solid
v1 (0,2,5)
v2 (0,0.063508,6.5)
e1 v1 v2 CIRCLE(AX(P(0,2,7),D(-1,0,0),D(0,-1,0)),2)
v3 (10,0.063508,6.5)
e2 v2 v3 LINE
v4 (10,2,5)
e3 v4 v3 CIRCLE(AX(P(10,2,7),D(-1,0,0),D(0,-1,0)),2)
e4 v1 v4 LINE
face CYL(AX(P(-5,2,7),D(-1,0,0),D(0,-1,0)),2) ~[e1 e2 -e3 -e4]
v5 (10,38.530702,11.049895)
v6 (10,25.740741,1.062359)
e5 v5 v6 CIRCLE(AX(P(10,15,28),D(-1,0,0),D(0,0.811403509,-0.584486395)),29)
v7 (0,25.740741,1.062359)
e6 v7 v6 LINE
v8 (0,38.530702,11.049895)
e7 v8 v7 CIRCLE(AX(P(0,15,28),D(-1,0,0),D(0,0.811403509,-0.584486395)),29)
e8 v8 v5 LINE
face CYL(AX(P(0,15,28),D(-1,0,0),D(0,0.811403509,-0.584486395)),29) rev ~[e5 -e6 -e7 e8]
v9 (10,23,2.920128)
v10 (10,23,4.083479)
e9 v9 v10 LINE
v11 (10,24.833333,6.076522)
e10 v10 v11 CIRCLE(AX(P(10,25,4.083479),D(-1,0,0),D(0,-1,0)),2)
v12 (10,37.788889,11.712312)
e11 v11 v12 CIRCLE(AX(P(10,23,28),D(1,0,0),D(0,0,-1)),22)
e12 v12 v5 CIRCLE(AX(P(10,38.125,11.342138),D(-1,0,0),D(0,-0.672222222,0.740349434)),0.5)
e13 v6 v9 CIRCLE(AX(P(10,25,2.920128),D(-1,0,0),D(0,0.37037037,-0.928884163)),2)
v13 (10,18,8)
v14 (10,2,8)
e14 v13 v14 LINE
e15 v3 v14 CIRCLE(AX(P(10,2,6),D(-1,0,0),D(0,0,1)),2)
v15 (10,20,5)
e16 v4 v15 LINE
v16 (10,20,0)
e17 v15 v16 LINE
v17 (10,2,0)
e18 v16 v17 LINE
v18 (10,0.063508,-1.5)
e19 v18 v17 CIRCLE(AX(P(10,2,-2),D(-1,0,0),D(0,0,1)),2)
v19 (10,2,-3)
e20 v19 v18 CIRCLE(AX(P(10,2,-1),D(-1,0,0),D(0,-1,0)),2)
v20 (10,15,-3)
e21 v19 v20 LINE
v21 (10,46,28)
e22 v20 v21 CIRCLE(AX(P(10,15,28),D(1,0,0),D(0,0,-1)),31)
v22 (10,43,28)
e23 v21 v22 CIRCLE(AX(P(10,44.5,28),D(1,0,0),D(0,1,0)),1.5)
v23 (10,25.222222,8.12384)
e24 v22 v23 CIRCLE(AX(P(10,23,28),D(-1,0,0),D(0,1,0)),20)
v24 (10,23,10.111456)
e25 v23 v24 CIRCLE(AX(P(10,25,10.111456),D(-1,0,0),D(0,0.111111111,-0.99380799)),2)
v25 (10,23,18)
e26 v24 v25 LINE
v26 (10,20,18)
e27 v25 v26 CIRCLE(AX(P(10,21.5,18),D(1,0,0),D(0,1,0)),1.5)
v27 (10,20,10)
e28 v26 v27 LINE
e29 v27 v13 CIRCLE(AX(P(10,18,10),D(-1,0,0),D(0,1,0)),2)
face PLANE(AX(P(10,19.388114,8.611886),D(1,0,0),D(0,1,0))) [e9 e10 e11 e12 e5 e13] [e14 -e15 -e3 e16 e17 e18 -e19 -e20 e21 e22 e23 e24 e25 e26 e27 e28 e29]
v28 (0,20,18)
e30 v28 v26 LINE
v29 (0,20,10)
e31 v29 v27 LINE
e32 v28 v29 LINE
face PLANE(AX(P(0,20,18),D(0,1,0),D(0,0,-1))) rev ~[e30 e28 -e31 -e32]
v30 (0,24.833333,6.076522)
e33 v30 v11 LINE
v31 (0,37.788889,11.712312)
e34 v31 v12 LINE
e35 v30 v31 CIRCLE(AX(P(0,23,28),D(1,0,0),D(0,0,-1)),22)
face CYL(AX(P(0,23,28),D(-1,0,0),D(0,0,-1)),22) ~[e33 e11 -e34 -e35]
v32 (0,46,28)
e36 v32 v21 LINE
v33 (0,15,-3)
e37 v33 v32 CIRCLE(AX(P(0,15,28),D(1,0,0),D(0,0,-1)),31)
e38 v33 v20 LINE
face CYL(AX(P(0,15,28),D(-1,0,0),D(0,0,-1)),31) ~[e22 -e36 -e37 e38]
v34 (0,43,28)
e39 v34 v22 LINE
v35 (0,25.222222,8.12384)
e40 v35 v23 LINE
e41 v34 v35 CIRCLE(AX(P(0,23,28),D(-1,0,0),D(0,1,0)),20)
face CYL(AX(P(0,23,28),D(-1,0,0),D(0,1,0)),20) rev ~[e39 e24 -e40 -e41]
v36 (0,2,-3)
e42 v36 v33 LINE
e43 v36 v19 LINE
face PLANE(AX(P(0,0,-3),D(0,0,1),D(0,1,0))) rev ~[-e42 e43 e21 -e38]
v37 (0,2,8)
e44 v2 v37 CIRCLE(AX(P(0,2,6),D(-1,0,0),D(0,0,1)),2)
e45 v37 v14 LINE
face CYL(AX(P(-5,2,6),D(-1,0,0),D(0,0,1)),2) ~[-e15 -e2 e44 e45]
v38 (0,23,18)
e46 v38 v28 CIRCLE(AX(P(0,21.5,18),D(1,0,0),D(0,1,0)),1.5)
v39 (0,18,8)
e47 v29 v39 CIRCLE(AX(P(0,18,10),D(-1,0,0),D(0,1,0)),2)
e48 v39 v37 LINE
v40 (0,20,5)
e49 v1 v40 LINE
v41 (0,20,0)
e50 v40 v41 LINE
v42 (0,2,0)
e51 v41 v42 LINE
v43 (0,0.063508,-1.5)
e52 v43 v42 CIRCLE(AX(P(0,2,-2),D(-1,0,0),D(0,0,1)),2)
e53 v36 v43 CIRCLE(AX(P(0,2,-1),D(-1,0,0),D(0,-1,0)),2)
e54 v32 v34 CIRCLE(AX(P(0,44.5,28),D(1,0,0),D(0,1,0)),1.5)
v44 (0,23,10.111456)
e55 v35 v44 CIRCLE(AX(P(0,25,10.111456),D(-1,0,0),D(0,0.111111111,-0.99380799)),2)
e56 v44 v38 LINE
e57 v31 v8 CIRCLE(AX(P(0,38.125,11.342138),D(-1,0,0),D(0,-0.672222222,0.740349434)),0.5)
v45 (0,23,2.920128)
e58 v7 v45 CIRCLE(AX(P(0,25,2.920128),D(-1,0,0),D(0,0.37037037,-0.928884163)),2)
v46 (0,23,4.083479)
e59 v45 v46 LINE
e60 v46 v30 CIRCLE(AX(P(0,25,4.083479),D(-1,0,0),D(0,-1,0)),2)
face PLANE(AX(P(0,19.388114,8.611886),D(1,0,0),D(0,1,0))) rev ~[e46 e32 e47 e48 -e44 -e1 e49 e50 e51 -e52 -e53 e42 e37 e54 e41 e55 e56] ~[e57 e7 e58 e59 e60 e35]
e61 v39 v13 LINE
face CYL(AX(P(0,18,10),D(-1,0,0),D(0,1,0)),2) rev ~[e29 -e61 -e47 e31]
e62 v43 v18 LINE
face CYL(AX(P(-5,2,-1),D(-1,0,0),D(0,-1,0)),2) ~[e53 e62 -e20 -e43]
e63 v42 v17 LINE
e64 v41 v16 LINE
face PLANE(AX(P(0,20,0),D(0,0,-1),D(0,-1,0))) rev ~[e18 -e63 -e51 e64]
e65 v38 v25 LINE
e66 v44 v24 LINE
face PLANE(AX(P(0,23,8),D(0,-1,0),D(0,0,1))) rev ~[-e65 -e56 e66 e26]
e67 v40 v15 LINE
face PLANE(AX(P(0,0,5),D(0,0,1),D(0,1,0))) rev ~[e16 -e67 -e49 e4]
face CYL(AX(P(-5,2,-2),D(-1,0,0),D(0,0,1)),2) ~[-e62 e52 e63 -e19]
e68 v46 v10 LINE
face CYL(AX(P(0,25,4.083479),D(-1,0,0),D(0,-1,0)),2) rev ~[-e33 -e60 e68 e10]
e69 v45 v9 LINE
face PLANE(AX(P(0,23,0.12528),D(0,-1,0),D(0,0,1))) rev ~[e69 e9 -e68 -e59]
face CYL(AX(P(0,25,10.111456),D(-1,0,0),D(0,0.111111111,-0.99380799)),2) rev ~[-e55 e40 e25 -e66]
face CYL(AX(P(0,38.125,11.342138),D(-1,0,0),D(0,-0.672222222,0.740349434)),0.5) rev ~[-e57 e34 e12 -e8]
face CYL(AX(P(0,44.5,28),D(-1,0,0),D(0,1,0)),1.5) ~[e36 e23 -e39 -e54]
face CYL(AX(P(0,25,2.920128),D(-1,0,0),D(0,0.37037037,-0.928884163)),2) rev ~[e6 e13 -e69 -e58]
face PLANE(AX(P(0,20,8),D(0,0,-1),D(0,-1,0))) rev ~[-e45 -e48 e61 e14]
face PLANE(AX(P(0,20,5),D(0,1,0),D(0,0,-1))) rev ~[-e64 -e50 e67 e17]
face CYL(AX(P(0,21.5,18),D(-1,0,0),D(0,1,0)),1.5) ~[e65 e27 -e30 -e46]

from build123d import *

# Parameters (mm, degrees)
F1_DEPTH    = 10
F2_T1_DEPTH = 10
F2_T3_DEPTH = 20


# Not quite as in the source:
# - a fillet or chamfer that OpenCascade refuses, or shapes differently, is made with other operations: its cross-section is extruded or revolved along the edge and cut away or added
# - a feature names something its author has since deleted; it is built from what else it names


with BuildPart() as f1:
    # F0 (on Right) → F1 (new body)
    with BuildSketch(Plane.YZ):
        with BuildLine():
            Line((20, 0), (0, 0))
            Line((0, 0), (0, -3))
            Line((0, -3), (15, -3))
            ThreePointArc((15, -3), (36.9203102168, 6.0796897832), (46, 28))
            ThreePointArc((46, 28), (44.5, 29.5), (43, 28))
            ThreePointArc((43, 28), (37.1421356237, 13.8578643763), (23, 8))
            Line((23, 8), (23, 18))
            ThreePointArc((23, 18), (21.5, 19.5), (20, 18))
            Line((20, 18), (20, 8))
            Line((20, 8), (0, 8))
            Line((0, 8), (0, 5))
            Line((0, 5), (20, 5))
            Line((20, 5), (20, 0))
        make_face()
        with BuildLine():
            Line((23, 0.1252802705), (23, 6))
            ThreePointArc((23, 6), (30.9268806632, 7.4777057094), (37.7888888889, 11.712312459))
            ThreePointArc((37.7888888889, 11.712312459), (38.4580316617, 11.7150853421), (38.5307017544, 11.0498945447))
            ThreePointArc((38.5307017544, 11.0498945447), (31.6848160775, 4.2804529457), (23, 0.1252802705))
        make_face(mode=Mode.SUBTRACT)
    extrude(amount=F1_DEPTH)

    # F2: fillet of radius 2 on 8 edges, made by hand

    # F2_s2 → F2_t1 (join)
    with BuildSketch(Plane.YZ):
        with BuildLine():
            ThreePointArc((20, 10), (19.4142135624, 8.5857864376), (18, 8))
            Line((18, 8), (20, 8))
            Line((20, 8), (20, 10))
        make_face()
        with BuildLine():
            ThreePointArc((25.2222222222, 8.1238402), (23.6666666667, 8.620744195), (23, 10.11145618))
            Line((23, 10.11145618), (23, 8))
            ThreePointArc((23, 8), (24.1128351181, 8.0309840503), (25.2222222222, 8.1238402))
        make_face()
        with BuildLine():
            ThreePointArc((23, 4.0834785138), (23.5280398556, 5.4374849146), (24.8333333333, 6.076521971))
            ThreePointArc((24.8333333333, 6.076521971), (23.9174648117, 6.0191388176), (23, 6))
            Line((23, 6), (23, 4.0834785138))
        make_face()
        with BuildLine():
            ThreePointArc((25.7407407407, 1.0623592655), (23.8778327846, 1.2646093225), (23, 2.920127592))
            Line((23, 2.920127592), (23, 0.1252802705))
            ThreePointArc((23, 0.1252802705), (24.3820770695, 0.5595803629), (25.7407407407, 1.0623592655))
        make_face()
    extrude(amount=F2_T1_DEPTH)

    # F2_s4 → F2_t3 (cut)
    with BuildSketch(Plane.YZ.offset(-5)):
        with BuildLine():
            ThreePointArc((2, 8), (0.5857864376, 7.4142135624), (0, 6))
            Line((0, 6), (0, 8))
            Line((0, 8), (2, 8))
        make_face()
        with BuildLine():
            ThreePointArc((0, 7), (0.5857864376, 5.5857864376), (2, 5))
            Line((2, 5), (0, 5))
            Line((0, 5), (0, 7))
        make_face()
        with BuildLine():
            ThreePointArc((2, 0), (0.5857864376, -0.5857864376), (0, -2))
            Line((0, -2), (0, 0))
            Line((0, 0), (2, 0))
        make_face()
        with BuildLine():
            ThreePointArc((0, -1), (0.5857864376, -2.4142135624), (2, -3))
            Line((2, -3), (0, -3))
            Line((0, -3), (0, -1))
        make_face()
    extrude(amount=F2_T3_DEPTH, mode=Mode.SUBTRACT)


solid = f1.part
